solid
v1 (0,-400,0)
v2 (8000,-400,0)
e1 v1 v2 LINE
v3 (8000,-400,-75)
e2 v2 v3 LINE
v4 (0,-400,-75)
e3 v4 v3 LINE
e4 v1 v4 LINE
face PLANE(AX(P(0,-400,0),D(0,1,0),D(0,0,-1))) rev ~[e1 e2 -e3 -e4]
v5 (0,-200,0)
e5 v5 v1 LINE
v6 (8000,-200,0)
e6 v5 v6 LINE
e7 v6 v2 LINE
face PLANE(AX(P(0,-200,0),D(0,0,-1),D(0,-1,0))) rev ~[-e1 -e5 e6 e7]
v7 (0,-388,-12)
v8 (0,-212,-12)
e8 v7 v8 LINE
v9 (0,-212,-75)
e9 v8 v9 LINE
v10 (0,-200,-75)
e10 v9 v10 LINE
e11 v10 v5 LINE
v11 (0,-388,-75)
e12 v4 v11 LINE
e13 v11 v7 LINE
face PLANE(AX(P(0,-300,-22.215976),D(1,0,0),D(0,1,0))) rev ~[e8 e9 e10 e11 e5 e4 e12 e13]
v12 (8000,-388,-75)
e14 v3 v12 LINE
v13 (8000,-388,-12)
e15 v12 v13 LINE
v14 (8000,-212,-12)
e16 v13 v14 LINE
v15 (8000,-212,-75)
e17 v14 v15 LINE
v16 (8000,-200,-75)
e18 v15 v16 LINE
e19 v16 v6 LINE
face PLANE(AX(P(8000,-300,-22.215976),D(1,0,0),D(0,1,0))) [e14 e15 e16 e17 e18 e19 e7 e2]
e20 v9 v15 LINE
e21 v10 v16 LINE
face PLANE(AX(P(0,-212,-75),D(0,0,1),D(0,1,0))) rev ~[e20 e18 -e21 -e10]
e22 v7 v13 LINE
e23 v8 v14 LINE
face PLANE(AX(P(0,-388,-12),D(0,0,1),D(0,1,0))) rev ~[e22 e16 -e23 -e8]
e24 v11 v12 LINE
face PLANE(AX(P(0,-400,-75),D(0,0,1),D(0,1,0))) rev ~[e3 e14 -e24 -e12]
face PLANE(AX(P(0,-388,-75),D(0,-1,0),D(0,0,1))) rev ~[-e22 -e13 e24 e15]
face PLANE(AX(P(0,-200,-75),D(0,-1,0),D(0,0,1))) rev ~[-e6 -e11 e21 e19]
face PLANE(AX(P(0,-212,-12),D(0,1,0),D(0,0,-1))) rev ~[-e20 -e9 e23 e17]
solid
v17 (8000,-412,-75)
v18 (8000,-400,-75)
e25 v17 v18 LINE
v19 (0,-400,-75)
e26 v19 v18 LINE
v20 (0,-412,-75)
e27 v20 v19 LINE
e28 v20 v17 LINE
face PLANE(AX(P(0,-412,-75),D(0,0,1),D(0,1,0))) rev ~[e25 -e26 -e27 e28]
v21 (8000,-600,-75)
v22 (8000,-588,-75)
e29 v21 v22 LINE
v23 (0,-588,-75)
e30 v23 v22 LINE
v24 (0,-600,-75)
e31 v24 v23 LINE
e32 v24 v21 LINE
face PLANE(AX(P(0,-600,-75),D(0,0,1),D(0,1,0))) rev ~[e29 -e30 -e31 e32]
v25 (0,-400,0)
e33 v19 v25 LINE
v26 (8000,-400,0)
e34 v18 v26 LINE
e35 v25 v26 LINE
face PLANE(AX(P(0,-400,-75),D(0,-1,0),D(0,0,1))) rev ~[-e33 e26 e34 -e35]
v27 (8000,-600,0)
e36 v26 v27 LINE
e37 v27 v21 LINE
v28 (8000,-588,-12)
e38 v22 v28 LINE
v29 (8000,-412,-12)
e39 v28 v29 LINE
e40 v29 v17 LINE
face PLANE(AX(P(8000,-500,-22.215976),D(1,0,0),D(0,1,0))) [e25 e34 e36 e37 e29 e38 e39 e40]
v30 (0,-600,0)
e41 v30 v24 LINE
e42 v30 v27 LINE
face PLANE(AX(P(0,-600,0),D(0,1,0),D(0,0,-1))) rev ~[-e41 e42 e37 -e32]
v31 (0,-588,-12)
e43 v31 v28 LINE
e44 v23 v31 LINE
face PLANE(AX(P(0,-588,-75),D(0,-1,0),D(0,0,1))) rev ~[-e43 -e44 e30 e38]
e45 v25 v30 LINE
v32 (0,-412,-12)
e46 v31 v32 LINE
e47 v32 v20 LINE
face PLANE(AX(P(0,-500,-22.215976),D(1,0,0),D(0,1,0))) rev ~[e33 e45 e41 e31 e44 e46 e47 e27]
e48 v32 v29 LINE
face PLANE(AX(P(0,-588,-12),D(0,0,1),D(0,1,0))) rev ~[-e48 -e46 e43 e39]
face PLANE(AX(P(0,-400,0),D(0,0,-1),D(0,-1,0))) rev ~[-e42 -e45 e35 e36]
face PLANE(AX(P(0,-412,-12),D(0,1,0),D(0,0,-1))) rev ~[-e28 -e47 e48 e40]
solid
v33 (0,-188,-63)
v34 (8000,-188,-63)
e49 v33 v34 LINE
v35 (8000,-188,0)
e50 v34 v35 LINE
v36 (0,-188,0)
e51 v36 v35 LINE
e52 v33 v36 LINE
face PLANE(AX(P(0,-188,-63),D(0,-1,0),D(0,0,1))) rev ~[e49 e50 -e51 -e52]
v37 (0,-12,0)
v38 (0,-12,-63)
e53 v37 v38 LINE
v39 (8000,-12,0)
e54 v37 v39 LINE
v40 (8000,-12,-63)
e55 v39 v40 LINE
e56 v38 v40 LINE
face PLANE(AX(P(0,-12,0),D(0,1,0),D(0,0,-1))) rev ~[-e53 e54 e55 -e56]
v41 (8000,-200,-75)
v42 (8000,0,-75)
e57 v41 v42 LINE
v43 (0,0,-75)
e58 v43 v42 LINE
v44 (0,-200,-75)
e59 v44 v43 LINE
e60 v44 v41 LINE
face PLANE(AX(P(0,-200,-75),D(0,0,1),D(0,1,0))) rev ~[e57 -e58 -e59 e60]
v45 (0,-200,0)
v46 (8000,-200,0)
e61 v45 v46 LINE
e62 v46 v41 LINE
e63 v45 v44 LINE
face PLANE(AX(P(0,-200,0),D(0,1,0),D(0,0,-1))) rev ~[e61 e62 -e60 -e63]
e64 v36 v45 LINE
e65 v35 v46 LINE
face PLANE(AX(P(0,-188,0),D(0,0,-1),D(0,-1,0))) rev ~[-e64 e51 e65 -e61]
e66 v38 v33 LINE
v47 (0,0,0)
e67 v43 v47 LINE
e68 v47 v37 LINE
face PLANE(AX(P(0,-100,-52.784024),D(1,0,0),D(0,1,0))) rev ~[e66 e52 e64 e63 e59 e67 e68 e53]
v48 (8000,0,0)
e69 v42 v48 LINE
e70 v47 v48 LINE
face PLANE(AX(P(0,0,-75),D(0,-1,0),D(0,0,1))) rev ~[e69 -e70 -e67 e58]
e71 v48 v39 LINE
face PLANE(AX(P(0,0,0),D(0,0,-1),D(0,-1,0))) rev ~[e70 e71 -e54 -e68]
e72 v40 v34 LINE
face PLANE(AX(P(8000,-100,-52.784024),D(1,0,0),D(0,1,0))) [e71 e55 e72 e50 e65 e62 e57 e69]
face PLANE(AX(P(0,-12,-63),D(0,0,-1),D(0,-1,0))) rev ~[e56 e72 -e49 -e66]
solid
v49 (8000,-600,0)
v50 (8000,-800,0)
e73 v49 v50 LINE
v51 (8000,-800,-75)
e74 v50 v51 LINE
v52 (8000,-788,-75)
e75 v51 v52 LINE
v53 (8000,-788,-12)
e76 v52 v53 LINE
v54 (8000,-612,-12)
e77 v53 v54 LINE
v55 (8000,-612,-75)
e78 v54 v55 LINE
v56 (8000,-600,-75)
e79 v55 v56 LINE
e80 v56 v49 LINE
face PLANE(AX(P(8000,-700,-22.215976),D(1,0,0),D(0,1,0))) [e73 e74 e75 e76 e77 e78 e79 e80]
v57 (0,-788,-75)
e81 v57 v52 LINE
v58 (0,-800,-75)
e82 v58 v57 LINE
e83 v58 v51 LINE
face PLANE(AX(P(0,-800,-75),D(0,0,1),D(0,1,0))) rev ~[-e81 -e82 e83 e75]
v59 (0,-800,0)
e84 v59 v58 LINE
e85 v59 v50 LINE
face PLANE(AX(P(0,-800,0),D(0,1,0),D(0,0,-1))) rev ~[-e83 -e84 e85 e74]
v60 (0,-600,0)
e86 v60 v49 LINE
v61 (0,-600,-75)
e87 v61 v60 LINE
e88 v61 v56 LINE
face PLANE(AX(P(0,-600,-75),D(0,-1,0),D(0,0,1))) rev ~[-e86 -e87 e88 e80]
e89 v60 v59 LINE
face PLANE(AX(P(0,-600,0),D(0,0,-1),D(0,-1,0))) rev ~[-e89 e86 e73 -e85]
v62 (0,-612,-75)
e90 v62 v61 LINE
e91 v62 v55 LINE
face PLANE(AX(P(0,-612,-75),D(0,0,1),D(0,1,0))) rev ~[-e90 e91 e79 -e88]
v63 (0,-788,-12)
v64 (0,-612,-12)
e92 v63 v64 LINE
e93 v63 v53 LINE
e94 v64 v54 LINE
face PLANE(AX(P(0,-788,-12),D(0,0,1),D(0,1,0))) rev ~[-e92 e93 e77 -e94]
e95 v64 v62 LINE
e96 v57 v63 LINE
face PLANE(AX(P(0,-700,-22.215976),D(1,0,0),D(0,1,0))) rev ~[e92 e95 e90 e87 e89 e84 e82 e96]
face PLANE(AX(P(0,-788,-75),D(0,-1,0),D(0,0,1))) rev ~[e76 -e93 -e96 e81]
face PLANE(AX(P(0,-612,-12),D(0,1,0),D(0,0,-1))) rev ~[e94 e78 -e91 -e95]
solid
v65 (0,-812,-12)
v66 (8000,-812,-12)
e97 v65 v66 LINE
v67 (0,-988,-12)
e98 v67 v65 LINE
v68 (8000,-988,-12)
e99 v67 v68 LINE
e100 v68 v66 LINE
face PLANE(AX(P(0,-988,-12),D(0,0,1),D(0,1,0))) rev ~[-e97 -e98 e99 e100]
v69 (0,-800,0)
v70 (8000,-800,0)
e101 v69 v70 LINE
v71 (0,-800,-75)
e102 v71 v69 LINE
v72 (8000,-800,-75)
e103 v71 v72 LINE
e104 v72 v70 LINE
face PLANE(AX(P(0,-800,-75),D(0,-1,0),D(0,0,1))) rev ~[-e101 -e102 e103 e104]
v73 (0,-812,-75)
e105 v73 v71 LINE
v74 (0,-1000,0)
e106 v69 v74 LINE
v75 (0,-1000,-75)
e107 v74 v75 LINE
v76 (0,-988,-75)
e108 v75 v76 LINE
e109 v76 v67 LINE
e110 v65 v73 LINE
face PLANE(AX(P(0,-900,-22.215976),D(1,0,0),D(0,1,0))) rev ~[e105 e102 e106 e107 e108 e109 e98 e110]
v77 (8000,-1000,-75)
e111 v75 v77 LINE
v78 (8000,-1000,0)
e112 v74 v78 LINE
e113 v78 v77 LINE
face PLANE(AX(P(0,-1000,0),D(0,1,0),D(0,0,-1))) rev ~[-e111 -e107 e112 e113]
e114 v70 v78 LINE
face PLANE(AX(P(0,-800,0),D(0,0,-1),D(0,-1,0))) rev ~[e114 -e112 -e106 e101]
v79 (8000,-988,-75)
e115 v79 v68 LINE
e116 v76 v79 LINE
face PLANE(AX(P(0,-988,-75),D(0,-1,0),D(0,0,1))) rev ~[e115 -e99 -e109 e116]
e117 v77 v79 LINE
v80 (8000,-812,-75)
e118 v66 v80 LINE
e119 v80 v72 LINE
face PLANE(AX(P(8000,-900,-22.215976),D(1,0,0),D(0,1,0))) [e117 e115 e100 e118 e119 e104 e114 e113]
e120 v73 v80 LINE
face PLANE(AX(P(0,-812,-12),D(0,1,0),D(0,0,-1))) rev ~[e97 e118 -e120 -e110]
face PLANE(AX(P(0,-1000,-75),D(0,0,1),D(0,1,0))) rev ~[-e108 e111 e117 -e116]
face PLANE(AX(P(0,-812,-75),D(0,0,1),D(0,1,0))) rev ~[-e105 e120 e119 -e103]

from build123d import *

# Parameters (mm, degrees)
F1_DEPTH = 8000
F2_DEPTH = 8000
F3_DEPTH = 8000
F4_DEPTH = 8000
F5_DEPTH = 8000


# Not quite as in the source:
# - a feature of the source that left no trace in its solid (it failed there, or was rolled back) is left out


with BuildPart() as f1:
    # F0 (on Right) → F1 (new body)
    with BuildSketch(Plane.YZ):
        Polygon((0, -75), (0, 0), (-12, 0), (-12, -63), (-188, -63), (-188, 0), (-200, 0), (-200, -75), align=None)
    extrude(amount=F1_DEPTH)


with BuildPart() as f2:
    # F0 (on Right) → F2 (new body)
    with BuildSketch(Plane.YZ):
        Polygon((-212, -75), (-200, -75), (-200, 0), (-400, 0), (-400, -75), (-388, -75), (-388, -12), (-212, -12), align=None)
    extrude(amount=F2_DEPTH)


with BuildPart() as f3:
    # F0 (on Right) → F3 (new body)
    with BuildSketch(Plane.YZ):
        Polygon((-400, -75), (-400, 0), (-600, 0), (-600, -75), (-588, -75), (-588, -12), (-412, -12), (-412, -75), align=None)
    extrude(amount=F3_DEPTH)


with BuildPart() as f4:
    # F0 (on Right) → F4 (new body)
    with BuildSketch(Plane.YZ):
        Polygon((-600, -75), (-600, 0), (-800, 0), (-800, -75), (-788, -75), (-788, -12), (-612, -12), (-612, -75), align=None)
    extrude(amount=F4_DEPTH)


with BuildPart() as f5:
    # F0 (on Right) → F5 (new body)
    with BuildSketch(Plane.YZ):
        Polygon((-800, -75), (-800, 0), (-812, 0), (-988, 0), (-1000, 0), (-1000, -75), (-988, -75), (-988, -12), (-812, -12), (-812, -75), align=None)
    extrude(amount=F5_DEPTH)


solid = Compound([f1.part, f2.part, f3.part, f4.part, f5.part])
